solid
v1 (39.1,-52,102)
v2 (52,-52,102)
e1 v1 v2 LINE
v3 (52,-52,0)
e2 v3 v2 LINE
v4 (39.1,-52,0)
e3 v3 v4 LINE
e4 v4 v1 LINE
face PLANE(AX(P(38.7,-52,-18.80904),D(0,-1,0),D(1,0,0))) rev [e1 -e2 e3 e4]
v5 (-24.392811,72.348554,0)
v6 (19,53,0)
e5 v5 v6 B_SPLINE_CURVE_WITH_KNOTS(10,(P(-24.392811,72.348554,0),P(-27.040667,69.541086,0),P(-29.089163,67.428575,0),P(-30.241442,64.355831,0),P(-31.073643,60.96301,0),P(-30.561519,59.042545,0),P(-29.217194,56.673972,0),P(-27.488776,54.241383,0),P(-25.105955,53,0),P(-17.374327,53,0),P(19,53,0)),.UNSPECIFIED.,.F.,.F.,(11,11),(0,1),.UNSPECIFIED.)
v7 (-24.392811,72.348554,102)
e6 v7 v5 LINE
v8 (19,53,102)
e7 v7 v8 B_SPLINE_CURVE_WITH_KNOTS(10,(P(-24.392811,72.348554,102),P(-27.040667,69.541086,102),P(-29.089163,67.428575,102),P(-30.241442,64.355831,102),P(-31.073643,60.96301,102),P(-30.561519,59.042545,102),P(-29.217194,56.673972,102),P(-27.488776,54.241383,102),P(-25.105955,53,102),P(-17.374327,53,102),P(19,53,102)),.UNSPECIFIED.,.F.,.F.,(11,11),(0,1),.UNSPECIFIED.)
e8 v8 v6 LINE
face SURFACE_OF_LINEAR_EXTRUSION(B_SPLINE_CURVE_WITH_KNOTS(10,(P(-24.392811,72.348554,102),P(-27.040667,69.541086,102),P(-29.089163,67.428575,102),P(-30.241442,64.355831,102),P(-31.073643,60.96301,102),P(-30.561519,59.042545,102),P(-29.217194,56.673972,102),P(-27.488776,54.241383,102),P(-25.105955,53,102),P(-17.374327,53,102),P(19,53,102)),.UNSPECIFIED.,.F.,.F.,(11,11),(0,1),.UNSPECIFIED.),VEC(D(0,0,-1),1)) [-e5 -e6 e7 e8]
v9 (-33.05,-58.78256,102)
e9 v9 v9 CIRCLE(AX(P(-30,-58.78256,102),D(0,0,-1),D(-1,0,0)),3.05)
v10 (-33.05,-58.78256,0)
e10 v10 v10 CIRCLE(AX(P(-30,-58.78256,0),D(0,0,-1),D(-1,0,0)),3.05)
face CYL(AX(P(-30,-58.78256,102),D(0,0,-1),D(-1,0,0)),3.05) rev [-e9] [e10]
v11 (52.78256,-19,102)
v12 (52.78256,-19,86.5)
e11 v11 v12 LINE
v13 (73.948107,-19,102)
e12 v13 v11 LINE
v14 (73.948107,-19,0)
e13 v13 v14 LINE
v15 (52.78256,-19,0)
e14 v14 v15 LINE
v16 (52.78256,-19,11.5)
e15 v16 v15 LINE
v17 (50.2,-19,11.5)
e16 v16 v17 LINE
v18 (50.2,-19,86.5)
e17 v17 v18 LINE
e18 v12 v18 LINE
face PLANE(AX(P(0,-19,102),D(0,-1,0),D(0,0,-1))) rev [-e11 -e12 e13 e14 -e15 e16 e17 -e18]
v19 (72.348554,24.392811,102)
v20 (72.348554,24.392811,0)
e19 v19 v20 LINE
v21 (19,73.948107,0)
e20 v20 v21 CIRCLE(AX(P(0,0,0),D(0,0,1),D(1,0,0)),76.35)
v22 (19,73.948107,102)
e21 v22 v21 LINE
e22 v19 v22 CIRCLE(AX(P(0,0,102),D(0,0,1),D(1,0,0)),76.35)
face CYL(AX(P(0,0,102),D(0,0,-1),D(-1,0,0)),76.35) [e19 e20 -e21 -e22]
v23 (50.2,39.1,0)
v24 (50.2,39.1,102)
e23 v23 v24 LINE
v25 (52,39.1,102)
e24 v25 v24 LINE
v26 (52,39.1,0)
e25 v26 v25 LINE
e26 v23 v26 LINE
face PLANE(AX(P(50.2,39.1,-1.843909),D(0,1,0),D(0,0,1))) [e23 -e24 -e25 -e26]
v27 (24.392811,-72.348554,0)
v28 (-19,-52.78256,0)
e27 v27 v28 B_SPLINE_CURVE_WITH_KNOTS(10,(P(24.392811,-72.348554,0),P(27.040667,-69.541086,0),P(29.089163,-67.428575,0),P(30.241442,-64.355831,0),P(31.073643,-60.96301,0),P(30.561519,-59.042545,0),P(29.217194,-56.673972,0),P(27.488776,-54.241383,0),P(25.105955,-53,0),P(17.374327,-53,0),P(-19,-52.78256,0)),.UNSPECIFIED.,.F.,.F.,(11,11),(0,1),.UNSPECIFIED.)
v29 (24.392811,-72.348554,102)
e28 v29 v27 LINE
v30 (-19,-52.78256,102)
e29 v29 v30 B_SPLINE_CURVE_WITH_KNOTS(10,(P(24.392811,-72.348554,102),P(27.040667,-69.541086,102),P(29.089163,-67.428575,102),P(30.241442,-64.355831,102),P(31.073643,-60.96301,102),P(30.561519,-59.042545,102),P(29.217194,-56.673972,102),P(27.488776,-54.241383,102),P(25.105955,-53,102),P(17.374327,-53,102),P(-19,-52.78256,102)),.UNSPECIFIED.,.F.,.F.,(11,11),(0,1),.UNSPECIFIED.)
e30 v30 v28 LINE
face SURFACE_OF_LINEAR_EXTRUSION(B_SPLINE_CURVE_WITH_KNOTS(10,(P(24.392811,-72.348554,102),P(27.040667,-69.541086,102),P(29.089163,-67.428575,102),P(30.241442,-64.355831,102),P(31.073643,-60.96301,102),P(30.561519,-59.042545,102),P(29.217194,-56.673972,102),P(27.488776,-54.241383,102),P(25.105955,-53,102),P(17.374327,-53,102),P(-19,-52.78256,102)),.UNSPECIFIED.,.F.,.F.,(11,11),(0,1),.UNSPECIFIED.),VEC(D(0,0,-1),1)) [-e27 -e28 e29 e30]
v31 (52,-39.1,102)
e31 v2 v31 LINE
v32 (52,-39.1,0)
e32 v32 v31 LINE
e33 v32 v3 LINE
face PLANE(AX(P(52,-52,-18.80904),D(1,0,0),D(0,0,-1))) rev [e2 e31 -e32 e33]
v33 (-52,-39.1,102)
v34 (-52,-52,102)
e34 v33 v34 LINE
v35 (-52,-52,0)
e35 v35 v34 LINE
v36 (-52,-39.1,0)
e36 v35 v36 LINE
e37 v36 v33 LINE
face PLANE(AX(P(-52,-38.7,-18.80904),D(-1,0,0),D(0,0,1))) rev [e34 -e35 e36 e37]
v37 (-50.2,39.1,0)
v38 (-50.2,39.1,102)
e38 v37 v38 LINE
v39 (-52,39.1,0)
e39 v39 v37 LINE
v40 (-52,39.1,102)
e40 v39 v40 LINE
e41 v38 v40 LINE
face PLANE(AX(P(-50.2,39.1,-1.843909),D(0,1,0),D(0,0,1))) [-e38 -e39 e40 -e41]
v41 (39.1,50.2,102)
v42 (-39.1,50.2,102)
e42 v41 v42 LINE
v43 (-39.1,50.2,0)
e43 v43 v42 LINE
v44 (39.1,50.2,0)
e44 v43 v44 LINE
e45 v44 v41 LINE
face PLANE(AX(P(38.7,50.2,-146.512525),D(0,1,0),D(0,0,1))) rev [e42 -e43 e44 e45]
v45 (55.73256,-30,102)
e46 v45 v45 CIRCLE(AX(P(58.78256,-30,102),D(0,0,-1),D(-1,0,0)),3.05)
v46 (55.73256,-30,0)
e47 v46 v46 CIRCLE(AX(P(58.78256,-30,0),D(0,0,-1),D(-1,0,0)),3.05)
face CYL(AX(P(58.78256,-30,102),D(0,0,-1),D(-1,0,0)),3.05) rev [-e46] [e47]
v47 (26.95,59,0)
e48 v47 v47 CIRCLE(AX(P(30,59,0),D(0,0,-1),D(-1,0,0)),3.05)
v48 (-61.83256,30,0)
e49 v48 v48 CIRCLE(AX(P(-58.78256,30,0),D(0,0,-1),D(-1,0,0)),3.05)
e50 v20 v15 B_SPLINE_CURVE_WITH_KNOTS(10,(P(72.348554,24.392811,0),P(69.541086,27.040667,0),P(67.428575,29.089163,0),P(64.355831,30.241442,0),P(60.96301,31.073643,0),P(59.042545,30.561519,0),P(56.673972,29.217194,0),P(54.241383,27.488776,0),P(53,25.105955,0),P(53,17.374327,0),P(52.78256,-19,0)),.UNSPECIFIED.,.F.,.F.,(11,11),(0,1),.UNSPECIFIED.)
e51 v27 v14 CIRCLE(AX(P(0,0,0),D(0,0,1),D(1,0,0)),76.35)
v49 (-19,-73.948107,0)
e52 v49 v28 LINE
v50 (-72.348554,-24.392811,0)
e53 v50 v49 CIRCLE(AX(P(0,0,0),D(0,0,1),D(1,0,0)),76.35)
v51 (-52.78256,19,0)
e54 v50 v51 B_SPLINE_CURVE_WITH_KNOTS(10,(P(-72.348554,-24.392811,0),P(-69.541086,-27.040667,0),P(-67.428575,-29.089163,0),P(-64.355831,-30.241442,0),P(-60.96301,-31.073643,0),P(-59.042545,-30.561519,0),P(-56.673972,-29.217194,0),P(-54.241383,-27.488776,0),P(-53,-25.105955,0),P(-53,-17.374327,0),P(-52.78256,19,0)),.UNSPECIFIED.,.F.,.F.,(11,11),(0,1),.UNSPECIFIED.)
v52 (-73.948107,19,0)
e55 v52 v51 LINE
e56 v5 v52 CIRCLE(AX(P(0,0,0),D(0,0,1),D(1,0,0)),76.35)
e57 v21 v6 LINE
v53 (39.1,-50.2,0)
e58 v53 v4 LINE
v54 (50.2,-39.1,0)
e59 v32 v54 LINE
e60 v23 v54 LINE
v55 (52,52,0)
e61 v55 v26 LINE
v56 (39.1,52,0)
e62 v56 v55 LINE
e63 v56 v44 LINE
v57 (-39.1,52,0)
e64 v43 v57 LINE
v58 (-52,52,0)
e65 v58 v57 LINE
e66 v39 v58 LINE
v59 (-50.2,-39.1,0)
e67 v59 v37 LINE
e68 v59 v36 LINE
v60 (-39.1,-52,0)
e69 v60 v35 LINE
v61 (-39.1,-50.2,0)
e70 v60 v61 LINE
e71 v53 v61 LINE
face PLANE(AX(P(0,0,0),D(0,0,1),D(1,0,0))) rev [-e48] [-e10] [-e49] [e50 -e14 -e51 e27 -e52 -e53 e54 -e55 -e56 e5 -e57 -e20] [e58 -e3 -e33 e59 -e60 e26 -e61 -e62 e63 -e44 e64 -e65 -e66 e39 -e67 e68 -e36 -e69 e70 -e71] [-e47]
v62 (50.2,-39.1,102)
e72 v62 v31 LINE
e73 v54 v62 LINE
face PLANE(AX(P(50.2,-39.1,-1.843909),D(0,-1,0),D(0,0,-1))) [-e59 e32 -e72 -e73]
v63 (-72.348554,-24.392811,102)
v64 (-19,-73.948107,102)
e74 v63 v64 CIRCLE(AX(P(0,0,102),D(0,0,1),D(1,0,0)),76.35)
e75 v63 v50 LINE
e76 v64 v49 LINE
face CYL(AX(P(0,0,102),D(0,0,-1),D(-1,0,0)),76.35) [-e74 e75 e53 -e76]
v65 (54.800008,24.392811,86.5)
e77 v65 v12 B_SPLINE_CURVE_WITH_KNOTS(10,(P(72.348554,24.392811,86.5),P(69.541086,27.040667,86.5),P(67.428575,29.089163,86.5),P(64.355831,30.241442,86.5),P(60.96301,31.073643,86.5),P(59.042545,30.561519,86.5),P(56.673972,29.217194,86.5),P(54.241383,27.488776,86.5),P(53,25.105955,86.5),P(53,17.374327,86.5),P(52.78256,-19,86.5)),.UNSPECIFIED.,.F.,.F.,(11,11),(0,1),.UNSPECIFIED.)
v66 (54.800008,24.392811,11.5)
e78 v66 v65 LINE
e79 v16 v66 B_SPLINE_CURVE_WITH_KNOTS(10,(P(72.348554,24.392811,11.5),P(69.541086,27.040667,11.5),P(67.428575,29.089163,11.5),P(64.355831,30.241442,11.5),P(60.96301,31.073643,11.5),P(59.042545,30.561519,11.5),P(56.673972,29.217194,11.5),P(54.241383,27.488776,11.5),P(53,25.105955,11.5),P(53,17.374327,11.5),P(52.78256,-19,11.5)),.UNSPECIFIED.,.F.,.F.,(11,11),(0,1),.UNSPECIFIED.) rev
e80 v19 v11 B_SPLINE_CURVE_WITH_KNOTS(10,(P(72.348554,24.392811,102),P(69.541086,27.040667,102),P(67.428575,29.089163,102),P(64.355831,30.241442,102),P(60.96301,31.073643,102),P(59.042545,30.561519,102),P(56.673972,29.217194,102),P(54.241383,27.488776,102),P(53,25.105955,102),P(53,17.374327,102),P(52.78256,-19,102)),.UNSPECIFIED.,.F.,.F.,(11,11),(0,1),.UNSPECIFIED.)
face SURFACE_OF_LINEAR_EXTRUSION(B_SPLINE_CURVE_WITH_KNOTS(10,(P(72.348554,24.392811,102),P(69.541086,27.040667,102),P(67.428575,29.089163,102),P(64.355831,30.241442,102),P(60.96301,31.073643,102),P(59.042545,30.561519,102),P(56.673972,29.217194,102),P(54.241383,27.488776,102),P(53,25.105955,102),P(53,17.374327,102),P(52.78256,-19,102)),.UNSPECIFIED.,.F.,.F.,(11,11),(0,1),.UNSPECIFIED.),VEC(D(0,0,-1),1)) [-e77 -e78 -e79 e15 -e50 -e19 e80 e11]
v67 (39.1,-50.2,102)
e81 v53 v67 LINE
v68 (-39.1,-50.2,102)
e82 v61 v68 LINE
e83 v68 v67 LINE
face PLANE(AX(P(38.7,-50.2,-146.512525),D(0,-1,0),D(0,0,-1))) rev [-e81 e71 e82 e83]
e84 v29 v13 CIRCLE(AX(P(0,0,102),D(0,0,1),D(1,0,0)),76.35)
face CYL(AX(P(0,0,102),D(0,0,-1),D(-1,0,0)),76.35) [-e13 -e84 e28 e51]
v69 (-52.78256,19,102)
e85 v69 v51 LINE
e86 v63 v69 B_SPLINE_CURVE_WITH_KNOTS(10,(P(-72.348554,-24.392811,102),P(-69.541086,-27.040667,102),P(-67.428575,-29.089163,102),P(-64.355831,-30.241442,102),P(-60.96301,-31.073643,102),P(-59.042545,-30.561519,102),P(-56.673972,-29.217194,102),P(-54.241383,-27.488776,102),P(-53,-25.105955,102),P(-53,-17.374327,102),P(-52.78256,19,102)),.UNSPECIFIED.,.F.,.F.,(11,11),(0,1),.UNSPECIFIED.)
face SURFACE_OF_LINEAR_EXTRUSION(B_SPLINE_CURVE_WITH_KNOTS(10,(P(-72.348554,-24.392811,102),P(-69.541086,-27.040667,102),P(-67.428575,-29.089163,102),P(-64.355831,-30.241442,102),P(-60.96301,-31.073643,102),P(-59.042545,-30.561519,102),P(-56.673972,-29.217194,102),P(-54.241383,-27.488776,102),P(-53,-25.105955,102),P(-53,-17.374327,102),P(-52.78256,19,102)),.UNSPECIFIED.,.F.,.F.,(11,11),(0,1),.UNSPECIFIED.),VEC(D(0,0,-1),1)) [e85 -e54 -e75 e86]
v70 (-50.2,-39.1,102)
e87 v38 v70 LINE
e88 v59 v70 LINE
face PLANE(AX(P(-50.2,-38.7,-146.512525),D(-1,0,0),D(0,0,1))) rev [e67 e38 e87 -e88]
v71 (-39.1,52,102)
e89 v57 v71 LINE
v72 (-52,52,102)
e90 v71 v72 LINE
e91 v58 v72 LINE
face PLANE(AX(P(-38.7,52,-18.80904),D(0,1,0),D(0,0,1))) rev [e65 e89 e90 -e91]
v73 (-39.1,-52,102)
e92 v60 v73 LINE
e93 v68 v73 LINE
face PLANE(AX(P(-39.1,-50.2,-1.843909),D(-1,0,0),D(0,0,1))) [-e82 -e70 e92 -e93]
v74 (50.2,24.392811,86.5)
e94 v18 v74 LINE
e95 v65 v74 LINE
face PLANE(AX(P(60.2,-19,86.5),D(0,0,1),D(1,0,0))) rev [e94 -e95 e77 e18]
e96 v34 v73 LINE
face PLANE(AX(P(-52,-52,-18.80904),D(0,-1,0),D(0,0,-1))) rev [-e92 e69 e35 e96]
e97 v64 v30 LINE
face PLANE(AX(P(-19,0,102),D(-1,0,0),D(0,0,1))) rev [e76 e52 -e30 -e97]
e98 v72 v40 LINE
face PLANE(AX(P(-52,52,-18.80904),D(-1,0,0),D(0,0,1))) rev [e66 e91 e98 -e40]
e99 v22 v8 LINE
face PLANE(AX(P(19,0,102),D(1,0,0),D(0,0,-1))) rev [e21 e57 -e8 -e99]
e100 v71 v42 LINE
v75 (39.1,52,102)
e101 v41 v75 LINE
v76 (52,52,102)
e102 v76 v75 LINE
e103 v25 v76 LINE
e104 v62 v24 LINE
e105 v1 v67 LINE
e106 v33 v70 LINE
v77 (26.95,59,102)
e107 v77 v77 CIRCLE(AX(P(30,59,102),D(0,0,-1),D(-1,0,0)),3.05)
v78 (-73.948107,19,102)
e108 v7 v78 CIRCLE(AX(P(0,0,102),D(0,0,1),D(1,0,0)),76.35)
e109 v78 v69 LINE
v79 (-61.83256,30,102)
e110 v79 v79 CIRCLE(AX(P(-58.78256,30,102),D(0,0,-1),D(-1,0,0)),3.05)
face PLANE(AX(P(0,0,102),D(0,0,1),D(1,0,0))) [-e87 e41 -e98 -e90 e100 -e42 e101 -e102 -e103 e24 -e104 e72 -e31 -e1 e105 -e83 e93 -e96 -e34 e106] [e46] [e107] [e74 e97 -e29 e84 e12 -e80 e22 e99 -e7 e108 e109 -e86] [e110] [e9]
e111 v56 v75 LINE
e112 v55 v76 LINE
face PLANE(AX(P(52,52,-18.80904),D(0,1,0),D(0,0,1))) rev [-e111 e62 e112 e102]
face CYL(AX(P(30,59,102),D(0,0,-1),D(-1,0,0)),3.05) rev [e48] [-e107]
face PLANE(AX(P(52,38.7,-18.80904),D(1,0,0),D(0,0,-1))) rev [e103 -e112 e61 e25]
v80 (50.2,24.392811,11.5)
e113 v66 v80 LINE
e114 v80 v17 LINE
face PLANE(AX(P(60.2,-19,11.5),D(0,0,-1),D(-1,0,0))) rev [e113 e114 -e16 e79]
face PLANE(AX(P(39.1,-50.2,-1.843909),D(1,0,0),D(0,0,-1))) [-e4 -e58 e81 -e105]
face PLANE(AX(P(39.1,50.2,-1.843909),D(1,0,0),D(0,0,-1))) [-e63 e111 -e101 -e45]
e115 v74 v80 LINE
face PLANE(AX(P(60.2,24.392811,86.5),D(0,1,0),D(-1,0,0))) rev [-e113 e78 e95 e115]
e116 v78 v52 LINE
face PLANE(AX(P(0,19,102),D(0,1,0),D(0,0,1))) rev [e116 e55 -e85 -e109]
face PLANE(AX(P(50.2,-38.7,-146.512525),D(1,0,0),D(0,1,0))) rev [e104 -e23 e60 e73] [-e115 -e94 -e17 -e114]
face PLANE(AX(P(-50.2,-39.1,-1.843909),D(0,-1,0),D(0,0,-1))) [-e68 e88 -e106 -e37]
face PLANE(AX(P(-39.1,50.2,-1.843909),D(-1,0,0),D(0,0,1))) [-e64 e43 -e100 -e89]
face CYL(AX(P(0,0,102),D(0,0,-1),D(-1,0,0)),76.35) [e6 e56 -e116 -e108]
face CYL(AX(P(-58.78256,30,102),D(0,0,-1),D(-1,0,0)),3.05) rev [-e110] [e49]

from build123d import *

# Parameters (mm, degrees)
BOSS_EXTRUDE3_OUTLINE_R = 3
BOSS_EXTRUDE3_DEPTH     = 102
CUT_EXTRUDE1_DEPTH      = 102
CUT_EXTRUDE2_DEPTH      = 102
SKETCH4_W               = 0.4
SKETCH4_H               = 1.8
SKETCH4_W_2             = 1.8
SKETCH4_H_2             = 0.4
BOSS_EXTRUDE4_DEPTH     = 102
SKETCH5_W               = 75
SKETCH5_H               = 43.392810524
CUT_EXTRUDE6_DEPTH      = 10
SKETCH7_R               = 3.05
CUT_EXTRUDE9_DEPTH      = 147.084376475


# Read off the part's stored shape, not the designer's step: Boss-Extrude3
with BuildPart() as part:
    # Boss-Extrude3 outline → Boss-Extrude3 (new body)
    with BuildSketch(Plane.XY):
        with BuildLine():
            add(Edge.make_bspline(
                [(24.392810524, -72.348554199), (27.040667073, -69.541086329), (29.089162938, -67.428574969), (30.241441862, -64.355831171), (31.073643307, -60.963009895), (30.561519341, -59.042545022), (29.217193929, -56.673971678), (27.488775543, -54.241382838), (25.105954954, -53), (17.37432721, -53), (-19, -52.782560411)],
                knots=[0, 0, 0, 0, 0, 0, 0, 0, 0, 0, 0, 1, 1, 1, 1, 1, 1, 1, 1, 1, 1, 1], degree=10))
            ThreePointArc((24.392810524, -72.348554199), (55.939709188, -51.962211615), (73.948106805, -19))
            Line((73.948106805, -19), (52.782560411, -19))
            add(Edge.make_bspline(
                [(72.348554199, 24.392810524), (69.541086329, 27.040667073), (67.428574969, 29.089162938), (64.355831171, 30.241441862), (60.963009895, 31.073643307), (59.042545022, 30.561519341), (56.673971678, 29.217193929), (54.241382838, 27.488775543), (53, 25.105954954), (53, 17.37432721), (52.782560411, -19)],
                knots=[0, 0, 0, 0, 0, 0, 0, 0, 0, 0, 0, 1, 1, 1, 1, 1, 1, 1, 1, 1, 1, 1], degree=10))
            ThreePointArc((72.348554199, 24.392810524), (51.962211615, 55.939709188), (19, 73.948106805))
            Line((19, 73.948106805), (19, 53))
            add(Edge.make_bspline(
                [(-24.392810524, 72.348554199), (-27.040667073, 69.541086329), (-29.089162938, 67.428574969), (-30.241441862, 64.355831171), (-31.073643307, 60.963009895), (-30.561519341, 59.042545022), (-29.217193929, 56.673971678), (-27.488775543, 54.241382838), (-25.105954954, 53), (-17.37432721, 53), (19, 53)],
                knots=[0, 0, 0, 0, 0, 0, 0, 0, 0, 0, 0, 1, 1, 1, 1, 1, 1, 1, 1, 1, 1, 1], degree=10))
            ThreePointArc((-24.392810524, 72.348554199), (-55.939709188, 51.962211615), (-73.948106805, 19))
            Line((-73.948106805, 19), (-52.782560411, 19))
            add(Edge.make_bspline(
                [(-72.348554199, -24.392810524), (-69.541086329, -27.040667073), (-67.428574969, -29.089162938), (-64.355831171, -30.241441862), (-60.963009895, -31.073643307), (-59.042545022, -30.561519341), (-56.673971678, -29.217193929), (-54.241382838, -27.488775543), (-53, -25.105954954), (-53, -17.37432721), (-52.782560411, 19)],
                knots=[0, 0, 0, 0, 0, 0, 0, 0, 0, 0, 0, 1, 1, 1, 1, 1, 1, 1, 1, 1, 1, 1], degree=10))
            ThreePointArc((-72.348554199, -24.392810524), (-51.962211615, -55.939709188), (-19, -73.948106805))
            Line((-19, -73.948106805), (-19, -52.782560411))
        make_face()
        with Locations((-30, -58.782560411)):
            Circle(BOSS_EXTRUDE3_OUTLINE_R, mode=Mode.SUBTRACT)
        with Locations((58.782560411, -30)):
            Circle(BOSS_EXTRUDE3_OUTLINE_R, mode=Mode.SUBTRACT)
        with Locations((-58.782560411, 30)):
            Circle(BOSS_EXTRUDE3_OUTLINE_R, mode=Mode.SUBTRACT)
        Polygon((-38.9, -51.6), (-51.6, -51.6), (-51.6, -38.9), (-50, -38.9), (-50, 38.9), (-51.6, 38.9), (-51.6, 51.6), (-38.9, 51.6), (-38.9, 50), (38.9, 50), (38.9, 51.6), (51.6, 51.6), (51.6, 38.9), (50, 38.9), (50, -38.9), (51.6, -38.9), (51.6, -51.6), (38.9, -51.6), (38.9, -50), (-38.9, -50), align=None, mode=Mode.SUBTRACT)
        with Locations((30, 59)):
            Circle(BOSS_EXTRUDE3_OUTLINE_R, mode=Mode.SUBTRACT)
    extrude(amount=BOSS_EXTRUDE3_DEPTH)

    # Sketch2 → Cut-Extrude1 (cut)
    with BuildSketch(Plane.XY.offset(102)):
        Polygon((51.8, -38.7), (50.2, -38.7), (50.2, 38.7), (51.8, 38.7), (51.8, 51.8), (38.7, 51.8), (38.7, 50.2), (-38.7, 50.2), (-38.7, 51.8), (-51.8, 51.8), (-51.8, 38.7), (-50.2, 38.7), (-50.2, -38.7), (-51.8, -38.7), (-51.8, -51.8), (-38.7, -51.8), (-38.7, -50.2), (38.7, -50.2), (38.7, -51.8), (51.8, -51.8), align=None)
        Polygon((51.6, -38.9), (50, -38.9), (50, 38.9), (51.6, 38.9), (51.6, 51.6), (38.9, 51.6), (38.9, 50), (-38.9, 50), (-38.9, 51.6), (-51.6, 51.6), (-51.6, 38.9), (-50, 38.9), (-50, -38.9), (-51.6, -38.9), (-51.6, -51.6), (-38.9, -51.6), (-38.9, -50), (38.9, -50), (38.9, -51.6), (51.6, -51.6), align=None, mode=Mode.SUBTRACT)
    extrude(amount=-CUT_EXTRUDE1_DEPTH, mode=Mode.SUBTRACT)

    # Sketch3 → Cut-Extrude2 (cut)
    with BuildSketch(Plane.XY.offset(102)):
        Polygon((-51.8, -51.8), (-38.7, -51.8), (-38.7, -52), (-52, -52), (-52, -38.7), (-51.8, -38.7), align=None)
        Polygon((38.7, -51.8), (51.8, -51.8), (51.8, -38.7), (52, -38.7), (52, -52), (38.7, -52), align=None)
        Polygon((51.8, 38.7), (51.8, 51.8), (38.7, 51.8), (38.7, 52), (52, 52), (52, 38.7), align=None)
        Polygon((-51.8, 51.8), (-51.8, 38.7), (-52, 38.7), (-52, 52), (-38.7, 52), (-38.7, 51.8), align=None)
    extrude(amount=-CUT_EXTRUDE2_DEPTH, mode=Mode.SUBTRACT)

    # Sketch4 → Boss-Extrude4 (add)
    with BuildSketch(Plane.XY.offset(102)):
        with Locations((-38.9, 51.1)):
            Rectangle(SKETCH4_W, SKETCH4_H)
        with Locations((-51.1, 38.9)):
            Rectangle(SKETCH4_W_2, SKETCH4_H_2)
        with Locations((38.9, 51.1)):
            Rectangle(SKETCH4_W, SKETCH4_H)
        with Locations((51.1, 38.9)):
            Rectangle(SKETCH4_W_2, SKETCH4_H_2)
        with Locations((38.9, -51.1)):
            Rectangle(SKETCH4_W, SKETCH4_H)
        with Locations((51.1, -38.9)):
            Rectangle(SKETCH4_W_2, SKETCH4_H_2)
        with Locations((-51.1, -38.9)):
            Rectangle(SKETCH4_W_2, SKETCH4_H_2)
        with Locations((-38.9, -51.1)):
            Rectangle(SKETCH4_W, SKETCH4_H)
    extrude(amount=-BOSS_EXTRUDE4_DEPTH)

    # Sketch5 → Cut-Extrude6 (cut)
    with BuildSketch(Plane.ZY.offset(-50.2)):
        with Locations((49, 2.696405262)):
            Rectangle(SKETCH5_W, SKETCH5_H)
    extrude(amount=-CUT_EXTRUDE6_DEPTH, mode=Mode.SUBTRACT)

    # Sketch7 → Cut-Extrude9 (cut, through all)
    with BuildSketch(Plane(origin=(0, 0, 0), x_dir=(-1, 0, 0), z_dir=(0, 0, -1))):
        with Locations((30, -58.782560411)):
            Circle(SKETCH7_R)
        with Locations((-58.782560411, -30)):
            Circle(SKETCH7_R)
        with Locations((58.782560411, 30)):
            Circle(SKETCH7_R)
        with Locations((-30, 59)):
            Circle(SKETCH7_R)
    extrude(amount=-CUT_EXTRUDE9_DEPTH, mode=Mode.SUBTRACT)


solid = part.part
